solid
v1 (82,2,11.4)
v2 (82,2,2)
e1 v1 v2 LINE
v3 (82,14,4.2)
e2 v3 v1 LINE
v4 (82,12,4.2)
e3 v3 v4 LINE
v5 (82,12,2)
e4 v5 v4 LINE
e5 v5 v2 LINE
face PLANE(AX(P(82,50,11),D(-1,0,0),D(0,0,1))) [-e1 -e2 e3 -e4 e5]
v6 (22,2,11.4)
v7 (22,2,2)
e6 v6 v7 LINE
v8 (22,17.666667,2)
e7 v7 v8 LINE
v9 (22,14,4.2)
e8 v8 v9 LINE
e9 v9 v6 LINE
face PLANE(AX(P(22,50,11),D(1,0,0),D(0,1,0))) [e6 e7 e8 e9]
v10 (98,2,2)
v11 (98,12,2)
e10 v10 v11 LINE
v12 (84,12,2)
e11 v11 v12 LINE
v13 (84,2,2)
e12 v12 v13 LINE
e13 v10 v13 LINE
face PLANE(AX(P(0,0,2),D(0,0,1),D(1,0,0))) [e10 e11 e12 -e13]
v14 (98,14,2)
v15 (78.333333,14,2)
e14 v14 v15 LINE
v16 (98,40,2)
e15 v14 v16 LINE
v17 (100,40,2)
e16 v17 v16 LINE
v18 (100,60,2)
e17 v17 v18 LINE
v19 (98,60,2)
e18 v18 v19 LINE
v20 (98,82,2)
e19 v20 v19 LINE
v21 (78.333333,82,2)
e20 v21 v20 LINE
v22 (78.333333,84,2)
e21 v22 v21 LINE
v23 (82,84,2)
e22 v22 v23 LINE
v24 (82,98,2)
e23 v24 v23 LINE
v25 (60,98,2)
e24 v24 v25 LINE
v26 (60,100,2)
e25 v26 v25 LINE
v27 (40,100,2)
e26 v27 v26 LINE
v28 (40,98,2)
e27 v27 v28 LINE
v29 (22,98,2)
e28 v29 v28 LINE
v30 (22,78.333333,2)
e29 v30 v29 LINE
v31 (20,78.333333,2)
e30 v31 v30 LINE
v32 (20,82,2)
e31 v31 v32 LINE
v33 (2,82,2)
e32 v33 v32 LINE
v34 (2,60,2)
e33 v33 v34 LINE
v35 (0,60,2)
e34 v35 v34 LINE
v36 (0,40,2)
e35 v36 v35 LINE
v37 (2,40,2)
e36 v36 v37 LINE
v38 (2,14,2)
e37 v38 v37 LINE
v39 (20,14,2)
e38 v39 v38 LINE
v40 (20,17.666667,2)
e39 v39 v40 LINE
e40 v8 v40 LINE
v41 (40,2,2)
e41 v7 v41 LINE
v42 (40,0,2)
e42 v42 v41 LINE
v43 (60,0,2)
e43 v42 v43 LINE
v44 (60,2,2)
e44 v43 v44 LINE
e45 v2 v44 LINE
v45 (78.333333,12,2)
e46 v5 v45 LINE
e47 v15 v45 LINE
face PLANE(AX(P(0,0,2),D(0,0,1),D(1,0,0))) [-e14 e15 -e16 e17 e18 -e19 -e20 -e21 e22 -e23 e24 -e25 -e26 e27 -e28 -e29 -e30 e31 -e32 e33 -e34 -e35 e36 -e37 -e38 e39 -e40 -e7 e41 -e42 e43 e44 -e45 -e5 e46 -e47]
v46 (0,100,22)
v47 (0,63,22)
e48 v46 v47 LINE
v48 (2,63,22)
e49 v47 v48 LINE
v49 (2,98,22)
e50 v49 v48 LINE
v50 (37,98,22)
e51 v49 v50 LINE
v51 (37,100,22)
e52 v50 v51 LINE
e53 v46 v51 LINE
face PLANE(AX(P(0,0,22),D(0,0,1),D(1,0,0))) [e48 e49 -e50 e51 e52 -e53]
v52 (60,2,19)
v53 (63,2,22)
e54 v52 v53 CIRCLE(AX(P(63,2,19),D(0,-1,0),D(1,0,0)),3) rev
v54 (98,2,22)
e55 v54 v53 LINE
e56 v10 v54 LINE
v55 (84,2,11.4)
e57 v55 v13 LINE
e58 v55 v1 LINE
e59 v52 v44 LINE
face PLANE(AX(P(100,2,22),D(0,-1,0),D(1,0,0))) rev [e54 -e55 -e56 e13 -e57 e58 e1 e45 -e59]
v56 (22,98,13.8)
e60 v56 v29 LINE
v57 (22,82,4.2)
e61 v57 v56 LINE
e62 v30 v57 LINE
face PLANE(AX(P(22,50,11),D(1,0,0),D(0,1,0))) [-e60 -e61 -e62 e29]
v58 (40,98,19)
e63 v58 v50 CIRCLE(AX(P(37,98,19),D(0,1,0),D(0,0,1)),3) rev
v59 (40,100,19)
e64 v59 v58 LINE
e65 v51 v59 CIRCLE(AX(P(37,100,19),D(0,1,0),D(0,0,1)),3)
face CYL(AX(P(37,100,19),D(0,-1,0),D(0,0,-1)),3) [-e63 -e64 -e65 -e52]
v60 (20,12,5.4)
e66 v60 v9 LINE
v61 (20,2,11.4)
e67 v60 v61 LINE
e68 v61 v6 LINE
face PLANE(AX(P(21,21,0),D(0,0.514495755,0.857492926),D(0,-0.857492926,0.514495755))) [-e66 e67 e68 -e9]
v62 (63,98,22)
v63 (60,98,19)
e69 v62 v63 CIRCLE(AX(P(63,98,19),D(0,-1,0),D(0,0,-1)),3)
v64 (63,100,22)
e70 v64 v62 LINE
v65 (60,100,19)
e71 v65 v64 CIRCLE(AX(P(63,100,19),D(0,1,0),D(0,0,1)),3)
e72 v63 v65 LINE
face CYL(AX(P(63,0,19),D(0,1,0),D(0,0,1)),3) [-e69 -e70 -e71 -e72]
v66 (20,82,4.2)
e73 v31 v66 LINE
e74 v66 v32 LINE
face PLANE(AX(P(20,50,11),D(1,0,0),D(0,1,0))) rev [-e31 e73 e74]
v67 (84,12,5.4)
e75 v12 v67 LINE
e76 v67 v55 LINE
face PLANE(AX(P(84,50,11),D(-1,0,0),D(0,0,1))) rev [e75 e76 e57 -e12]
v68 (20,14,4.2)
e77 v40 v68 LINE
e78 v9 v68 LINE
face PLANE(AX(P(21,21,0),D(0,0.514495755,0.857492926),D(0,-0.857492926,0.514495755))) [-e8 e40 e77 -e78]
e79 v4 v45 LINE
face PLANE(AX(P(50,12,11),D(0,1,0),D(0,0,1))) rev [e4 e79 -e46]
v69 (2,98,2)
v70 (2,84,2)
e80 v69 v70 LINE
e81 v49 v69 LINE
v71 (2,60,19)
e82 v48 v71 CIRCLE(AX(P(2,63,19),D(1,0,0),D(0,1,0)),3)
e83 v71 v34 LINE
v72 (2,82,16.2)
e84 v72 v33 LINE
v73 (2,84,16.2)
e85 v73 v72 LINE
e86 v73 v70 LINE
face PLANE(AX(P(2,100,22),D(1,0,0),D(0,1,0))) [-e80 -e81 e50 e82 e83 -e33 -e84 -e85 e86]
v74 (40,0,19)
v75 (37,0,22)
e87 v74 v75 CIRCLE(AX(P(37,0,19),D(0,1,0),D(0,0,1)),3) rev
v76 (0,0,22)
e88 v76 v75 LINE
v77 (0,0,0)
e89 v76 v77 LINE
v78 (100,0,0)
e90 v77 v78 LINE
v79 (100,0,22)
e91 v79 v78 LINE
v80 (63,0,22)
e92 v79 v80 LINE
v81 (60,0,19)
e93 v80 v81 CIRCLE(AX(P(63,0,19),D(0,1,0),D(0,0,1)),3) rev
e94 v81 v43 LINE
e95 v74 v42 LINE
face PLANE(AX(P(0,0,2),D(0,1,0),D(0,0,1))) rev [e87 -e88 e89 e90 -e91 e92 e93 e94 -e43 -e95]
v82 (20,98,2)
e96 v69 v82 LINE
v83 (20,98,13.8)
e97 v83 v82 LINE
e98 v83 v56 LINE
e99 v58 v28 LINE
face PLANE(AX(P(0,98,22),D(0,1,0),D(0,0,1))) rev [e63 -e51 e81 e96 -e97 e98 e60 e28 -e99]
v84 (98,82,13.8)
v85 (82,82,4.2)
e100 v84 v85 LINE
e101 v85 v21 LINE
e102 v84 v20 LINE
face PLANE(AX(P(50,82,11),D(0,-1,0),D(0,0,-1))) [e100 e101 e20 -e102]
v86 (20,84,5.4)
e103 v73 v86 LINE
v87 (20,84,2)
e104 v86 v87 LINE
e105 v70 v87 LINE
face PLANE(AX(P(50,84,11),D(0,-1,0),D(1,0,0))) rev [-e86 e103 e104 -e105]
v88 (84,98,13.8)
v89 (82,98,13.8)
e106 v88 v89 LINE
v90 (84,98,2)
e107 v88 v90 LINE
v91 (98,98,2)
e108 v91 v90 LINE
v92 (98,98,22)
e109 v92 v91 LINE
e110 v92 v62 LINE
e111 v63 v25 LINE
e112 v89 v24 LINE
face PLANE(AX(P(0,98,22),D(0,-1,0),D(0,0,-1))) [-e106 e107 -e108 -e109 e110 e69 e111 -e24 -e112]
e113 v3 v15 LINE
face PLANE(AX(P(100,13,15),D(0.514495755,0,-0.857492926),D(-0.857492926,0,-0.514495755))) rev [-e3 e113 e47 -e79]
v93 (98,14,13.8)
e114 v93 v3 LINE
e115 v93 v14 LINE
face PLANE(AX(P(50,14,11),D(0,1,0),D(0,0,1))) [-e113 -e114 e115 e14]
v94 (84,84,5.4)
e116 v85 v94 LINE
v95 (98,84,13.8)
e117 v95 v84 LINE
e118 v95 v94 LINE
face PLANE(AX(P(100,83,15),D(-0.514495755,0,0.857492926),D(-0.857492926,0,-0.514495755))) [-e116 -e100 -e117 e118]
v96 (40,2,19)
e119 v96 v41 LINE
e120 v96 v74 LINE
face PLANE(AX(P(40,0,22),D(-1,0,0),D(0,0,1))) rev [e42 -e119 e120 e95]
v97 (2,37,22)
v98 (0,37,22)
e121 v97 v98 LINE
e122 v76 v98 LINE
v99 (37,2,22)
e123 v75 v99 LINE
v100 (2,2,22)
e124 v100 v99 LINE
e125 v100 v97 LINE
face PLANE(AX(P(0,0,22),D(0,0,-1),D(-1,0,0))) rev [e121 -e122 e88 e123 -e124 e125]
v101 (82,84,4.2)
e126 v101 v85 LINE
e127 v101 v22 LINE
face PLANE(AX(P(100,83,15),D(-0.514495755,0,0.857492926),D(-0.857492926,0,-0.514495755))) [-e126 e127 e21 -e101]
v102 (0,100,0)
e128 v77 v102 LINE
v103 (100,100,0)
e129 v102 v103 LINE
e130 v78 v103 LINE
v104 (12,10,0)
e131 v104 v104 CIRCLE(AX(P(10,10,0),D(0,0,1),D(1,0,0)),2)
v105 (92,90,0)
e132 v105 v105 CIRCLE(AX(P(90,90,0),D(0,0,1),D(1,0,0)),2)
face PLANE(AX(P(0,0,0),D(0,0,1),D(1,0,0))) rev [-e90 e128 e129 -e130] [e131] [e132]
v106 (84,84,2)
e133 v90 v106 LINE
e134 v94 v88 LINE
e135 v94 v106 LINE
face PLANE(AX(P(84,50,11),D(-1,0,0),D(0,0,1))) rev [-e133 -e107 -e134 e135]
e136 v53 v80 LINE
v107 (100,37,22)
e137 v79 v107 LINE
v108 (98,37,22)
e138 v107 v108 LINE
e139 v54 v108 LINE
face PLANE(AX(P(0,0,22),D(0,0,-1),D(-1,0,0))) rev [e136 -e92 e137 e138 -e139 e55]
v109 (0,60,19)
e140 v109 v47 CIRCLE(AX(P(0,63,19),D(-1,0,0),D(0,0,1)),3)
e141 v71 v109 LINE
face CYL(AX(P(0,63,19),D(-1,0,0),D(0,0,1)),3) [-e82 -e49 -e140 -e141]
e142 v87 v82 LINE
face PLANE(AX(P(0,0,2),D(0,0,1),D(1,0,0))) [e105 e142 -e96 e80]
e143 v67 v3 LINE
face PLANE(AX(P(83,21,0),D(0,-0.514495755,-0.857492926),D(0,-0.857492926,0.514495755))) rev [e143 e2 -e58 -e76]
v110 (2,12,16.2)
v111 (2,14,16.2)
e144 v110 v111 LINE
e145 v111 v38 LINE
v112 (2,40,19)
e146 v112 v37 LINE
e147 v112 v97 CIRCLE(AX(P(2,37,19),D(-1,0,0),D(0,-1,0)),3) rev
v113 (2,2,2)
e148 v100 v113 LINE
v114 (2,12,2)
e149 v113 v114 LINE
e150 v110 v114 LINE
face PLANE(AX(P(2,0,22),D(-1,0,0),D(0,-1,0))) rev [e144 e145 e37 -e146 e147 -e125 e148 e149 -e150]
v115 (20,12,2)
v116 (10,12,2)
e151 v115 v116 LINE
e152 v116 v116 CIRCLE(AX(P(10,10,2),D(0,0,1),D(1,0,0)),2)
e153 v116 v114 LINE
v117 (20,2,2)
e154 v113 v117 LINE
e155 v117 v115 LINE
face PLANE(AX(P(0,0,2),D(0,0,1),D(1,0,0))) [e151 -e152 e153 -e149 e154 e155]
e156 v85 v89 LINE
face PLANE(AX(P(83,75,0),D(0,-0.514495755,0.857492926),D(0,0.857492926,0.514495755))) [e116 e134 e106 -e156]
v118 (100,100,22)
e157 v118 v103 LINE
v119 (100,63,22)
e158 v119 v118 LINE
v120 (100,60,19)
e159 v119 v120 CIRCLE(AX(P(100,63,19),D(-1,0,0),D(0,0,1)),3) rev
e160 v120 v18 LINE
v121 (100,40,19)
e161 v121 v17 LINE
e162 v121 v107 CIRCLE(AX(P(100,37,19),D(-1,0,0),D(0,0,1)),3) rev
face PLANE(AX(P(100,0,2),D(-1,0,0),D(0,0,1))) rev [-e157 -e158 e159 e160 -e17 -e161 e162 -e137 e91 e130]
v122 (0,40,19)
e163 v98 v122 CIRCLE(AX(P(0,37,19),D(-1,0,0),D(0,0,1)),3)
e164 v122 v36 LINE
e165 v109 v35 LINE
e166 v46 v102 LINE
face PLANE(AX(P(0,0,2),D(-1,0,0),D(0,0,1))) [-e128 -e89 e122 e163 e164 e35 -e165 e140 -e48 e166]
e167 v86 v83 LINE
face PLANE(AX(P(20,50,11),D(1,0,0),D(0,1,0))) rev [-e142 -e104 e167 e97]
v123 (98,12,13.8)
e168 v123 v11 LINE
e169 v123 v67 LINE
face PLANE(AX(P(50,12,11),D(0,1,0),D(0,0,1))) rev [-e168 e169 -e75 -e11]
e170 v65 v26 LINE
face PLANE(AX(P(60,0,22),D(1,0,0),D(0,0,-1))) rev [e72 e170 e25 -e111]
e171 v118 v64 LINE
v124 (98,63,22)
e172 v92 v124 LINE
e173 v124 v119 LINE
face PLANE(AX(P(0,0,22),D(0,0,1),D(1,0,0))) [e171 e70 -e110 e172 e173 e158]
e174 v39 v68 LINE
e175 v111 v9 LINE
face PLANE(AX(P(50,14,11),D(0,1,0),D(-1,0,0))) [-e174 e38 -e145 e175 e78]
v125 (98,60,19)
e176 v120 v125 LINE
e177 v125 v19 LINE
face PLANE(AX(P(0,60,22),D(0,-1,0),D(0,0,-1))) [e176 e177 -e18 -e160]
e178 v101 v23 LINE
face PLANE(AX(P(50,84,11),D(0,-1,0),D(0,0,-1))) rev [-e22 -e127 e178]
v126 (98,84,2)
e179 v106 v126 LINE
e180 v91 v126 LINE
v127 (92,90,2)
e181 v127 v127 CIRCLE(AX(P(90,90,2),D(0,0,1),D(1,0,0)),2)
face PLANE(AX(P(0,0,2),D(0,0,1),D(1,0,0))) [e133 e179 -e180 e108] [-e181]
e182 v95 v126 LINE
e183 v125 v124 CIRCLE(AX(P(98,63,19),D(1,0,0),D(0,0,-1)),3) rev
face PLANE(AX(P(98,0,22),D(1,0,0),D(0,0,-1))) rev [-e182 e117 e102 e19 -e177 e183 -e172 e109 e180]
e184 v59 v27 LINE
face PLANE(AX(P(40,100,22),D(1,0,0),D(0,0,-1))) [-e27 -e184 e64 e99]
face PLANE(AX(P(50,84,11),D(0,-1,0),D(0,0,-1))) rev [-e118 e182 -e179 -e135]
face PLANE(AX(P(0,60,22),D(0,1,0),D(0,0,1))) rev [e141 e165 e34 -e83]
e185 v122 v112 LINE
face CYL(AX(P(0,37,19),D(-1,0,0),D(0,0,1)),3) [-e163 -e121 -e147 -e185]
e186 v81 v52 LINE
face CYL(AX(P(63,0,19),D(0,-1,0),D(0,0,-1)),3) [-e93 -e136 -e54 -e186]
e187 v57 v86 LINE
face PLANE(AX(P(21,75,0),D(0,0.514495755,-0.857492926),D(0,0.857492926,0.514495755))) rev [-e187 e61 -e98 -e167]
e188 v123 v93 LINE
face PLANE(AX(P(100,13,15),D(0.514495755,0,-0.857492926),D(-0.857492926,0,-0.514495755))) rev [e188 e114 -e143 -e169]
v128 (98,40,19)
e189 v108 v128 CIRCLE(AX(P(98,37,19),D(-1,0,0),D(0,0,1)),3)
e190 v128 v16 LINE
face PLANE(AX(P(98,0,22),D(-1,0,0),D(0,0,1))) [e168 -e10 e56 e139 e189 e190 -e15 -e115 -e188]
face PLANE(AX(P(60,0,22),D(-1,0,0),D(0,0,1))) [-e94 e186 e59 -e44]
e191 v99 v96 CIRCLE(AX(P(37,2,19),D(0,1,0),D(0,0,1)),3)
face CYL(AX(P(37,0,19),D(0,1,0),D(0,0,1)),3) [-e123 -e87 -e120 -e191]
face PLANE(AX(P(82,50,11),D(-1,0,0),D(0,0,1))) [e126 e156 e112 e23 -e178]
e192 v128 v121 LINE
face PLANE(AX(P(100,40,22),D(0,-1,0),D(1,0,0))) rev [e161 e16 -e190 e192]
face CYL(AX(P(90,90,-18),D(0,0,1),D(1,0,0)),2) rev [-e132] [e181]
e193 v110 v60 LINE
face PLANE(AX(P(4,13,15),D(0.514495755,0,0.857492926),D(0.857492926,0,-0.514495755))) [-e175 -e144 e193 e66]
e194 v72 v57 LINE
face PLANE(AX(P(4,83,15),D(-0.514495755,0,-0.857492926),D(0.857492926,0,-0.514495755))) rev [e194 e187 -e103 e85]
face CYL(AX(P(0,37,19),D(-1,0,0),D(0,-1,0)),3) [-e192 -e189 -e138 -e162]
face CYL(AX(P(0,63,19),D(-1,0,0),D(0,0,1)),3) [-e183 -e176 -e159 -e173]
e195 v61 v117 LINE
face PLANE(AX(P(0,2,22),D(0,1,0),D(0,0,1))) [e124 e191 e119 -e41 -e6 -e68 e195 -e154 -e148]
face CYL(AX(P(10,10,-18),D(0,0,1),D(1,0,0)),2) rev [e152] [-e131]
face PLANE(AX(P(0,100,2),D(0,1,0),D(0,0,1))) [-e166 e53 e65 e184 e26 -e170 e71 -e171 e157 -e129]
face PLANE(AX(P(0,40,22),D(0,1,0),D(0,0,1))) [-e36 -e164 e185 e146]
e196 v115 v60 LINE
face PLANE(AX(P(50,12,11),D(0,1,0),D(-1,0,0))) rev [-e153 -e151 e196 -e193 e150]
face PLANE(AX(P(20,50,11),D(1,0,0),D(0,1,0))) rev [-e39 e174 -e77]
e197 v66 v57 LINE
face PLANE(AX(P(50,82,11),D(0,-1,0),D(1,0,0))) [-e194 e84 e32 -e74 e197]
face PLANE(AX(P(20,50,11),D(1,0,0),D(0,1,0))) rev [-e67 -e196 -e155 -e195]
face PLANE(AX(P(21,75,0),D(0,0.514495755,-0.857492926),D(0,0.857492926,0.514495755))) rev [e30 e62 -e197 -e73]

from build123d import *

# Parameters (mm, degrees)
SKETCH_1_W          = 100
SKETCH_1_H          = 100
EXTRUDE_1_DEPTH     = 2
SKETCH_2_W          = 2
SKETCH_2_H          = 2
SKETCH_2_W_2        = 38
SKETCH_2_H_2        = 38
EXTRUDE_2_DEPTH     = 20
SKETCH_3_W          = 38
SKETCH_3_H          = 2
SKETCH_3_W_2        = 2
SKETCH_3_H_2        = 38
SKETCH_3_H_3        = 40
SKETCH_3_W_3        = 40
EXTRUDE_3_DEPTH     = 20
RIB_2_REACH         = 133.807
SKETCH_7_WALL_W     = 294.768112702
SKETCH_7_WALL_H     = 2
FILLET_1_R          = 3
RIB_3_REACH         = 133.807
SKETCH_8_WALL_W     = 294.768112702
SKETCH_8_WALL_H     = 2
MIRROR_START        = 20
MIRROR_3_DEPTH      = 2
MIRROR_START_2      = 82
MIRROR_3_2_DEPTH    = 2
MIRROR_START_3      = 2
MIRROR_3_3_DEPTH    = 18
MIRROR_START_4      = 84
MIRROR_3_4_DEPTH    = 14
MIRROR_START_5      = 12
MIRROR_3_5_DEPTH    = 2
SKETCH_10_R         = 2
CUT_EXTRUDE_1_DEPTH = 20
SKETCH_11_R         = 2
CUT_EXTRUDE_2_DEPTH = 20


with BuildPart() as part:
    # 草图1 → 凸台-拉伸1 (new body)
    with BuildSketch(Plane.XY):
        with Locations((50, 50)):
            Rectangle(SKETCH_1_W, SKETCH_1_H)
    extrude(amount=EXTRUDE_1_DEPTH)

    # 草图2 → 凸台-拉伸2 (add)
    with BuildSketch(Plane.XY.offset(2)):
        with Locations((1, 99)):
            Rectangle(SKETCH_2_W, SKETCH_2_H)
        with Locations((21, 99)):
            Rectangle(SKETCH_2_W_2, SKETCH_2_H)
        with Locations((1, 79)):
            Rectangle(SKETCH_2_W, SKETCH_2_H_2)
        with Locations((1, 21)):
            Rectangle(SKETCH_2_W, SKETCH_2_H_2)
        with Locations((1, 1)):
            Rectangle(SKETCH_2_W, SKETCH_2_H)
        with Locations((21, 1)):
            Rectangle(SKETCH_2_W_2, SKETCH_2_H)
    extrude(amount=EXTRUDE_2_DEPTH)

    # 草图3 → 凸台-拉伸3 (add)
    with BuildSketch(Plane.XY.offset(2)):
        with Locations((79, 99)):
            Rectangle(SKETCH_3_W, SKETCH_3_H)
        with Locations((99, 99)):
            Rectangle(SKETCH_3_W_2, SKETCH_3_H)
        with Locations((99, 79)):
            Rectangle(SKETCH_3_W_2, SKETCH_3_H_2)
        with Locations((99, 20)):
            Rectangle(SKETCH_3_W_2, SKETCH_3_H_3)
        with Locations((80, 1)):
            Rectangle(SKETCH_3_W_3, SKETCH_3_H)
    extrude(amount=EXTRUDE_3_DEPTH)

    # 草图7 wall → 筋2 (add, up to next)
    with BuildSketch(Plane(origin=(87.5, 83, 7.5), x_dir=(-0.857492925713, 0, -0.514495755428), z_dir=(0.514495755428, 0, -0.857492925713)), mode=Mode.PRIVATE) as rib_2_sk1:
        Rectangle(SKETCH_7_WALL_W, SKETCH_7_WALL_H)
    rib_2_tool1 = extrude(rib_2_sk1.sketch, amount=RIB_2_REACH, mode=Mode.PRIVATE) - part.part
    rib_2 = rib_2_tool1.solids().sort_by_distance((87.5, 83, 7.5))[0]
    add(rib_2)

    # 圆角1
    fillet_1_edges = [part.edges().sort_by_distance(p)[0] for p in [
        (40, 1, 22),
        (1, 40, 22),
        (1, 60, 22),
        (40, 99, 22),
        (99, 60, 22),
        (60, 99, 22),
        (99, 40, 22),
        (60, 1, 22),
    ]]
    fillet(fillet_1_edges, radius=FILLET_1_R)

    # 草图8 wall → 筋3 (add, up to next)
    with BuildSketch(Plane(origin=(83, 87.5, 7.5), x_dir=(0, 0.857492925713, 0.514495755428), z_dir=(0, 0.514495755428, -0.857492925713)), mode=Mode.PRIVATE) as rib_3_sk1:
        Rectangle(SKETCH_8_WALL_W, SKETCH_8_WALL_H)
    rib_3_tool1 = extrude(rib_3_sk1.sketch, amount=RIB_3_REACH, mode=Mode.PRIVATE) - part.part
    rib_3 = rib_3_tool1.solids().sort_by_distance((83, 87.5, 7.5))[0]
    add(rib_3)

    # 镜向1: 筋3 mirrored; each copy of 筋3 runs up to whatever stops it at its own place
    mirror_1_before = part.part  # the part as the pattern finds it: every copy runs up to it
    mirror_1_rib_3_long = extrude(rib_3_sk1.sketch, amount=RIB_3_REACH, mode=Mode.PRIVATE)
    mirror_1_rib_3_tool1 = mirror_1_rib_3_long.mirror(Plane(origin=(52, 0, 0), x_dir=(0, 0, 1), z_dir=(1, 0, 0))) - mirror_1_before
    add(mirror_1_rib_3_tool1.solids().sort_by_distance((21, 87.5, 7.5))[0])

    # 镜向2: 筋2 mirrored; each copy of 筋2 runs up to whatever stops it at its own place
    mirror_2_before = part.part  # the part as the pattern finds it: every copy runs up to it
    mirror_2_rib_2_long = extrude(rib_2_sk1.sketch, amount=RIB_2_REACH, mode=Mode.PRIVATE)
    mirror_2_rib_2_tool1 = mirror_2_rib_2_long.mirror(Plane(origin=(52, 0, 0), x_dir=(0, 0, 1), z_dir=(1, 0, 0))) - mirror_2_before
    add(mirror_2_rib_2_tool1.solids().sort_by_distance((16.5, 83, 7.5))[0])

    # 镜向3: read off the stored shape, not the designer's step
    # 镜向3 outline → 镜向3 (add)
    with BuildSketch(Plane.YZ.offset(MIRROR_START)):
        Polygon((17.666666667, 2), (14, 4.2), (2, 11.4), (2, 2), align=None)
    extrude(amount=MIRROR_3_DEPTH)

    # Mirror 3 2 outline → Mirror 3 2 (add)
    with BuildSketch(Plane.YZ.offset(MIRROR_START_2)):
        Polygon((14, 2), (14, 4.2), (2, 11.4), (2, 2), align=None)
    extrude(amount=MIRROR_3_2_DEPTH)

    # Mirror 3 3 outline → Mirror 3 3 (add)
    with BuildSketch(Plane.YZ.offset(MIRROR_START_3)):
        Polygon((14, 2), (14, 4.2), (12, 5.4), (12, 2), align=None)
    extrude(amount=MIRROR_3_3_DEPTH)

    # Mirror 3 4 outline → Mirror 3 4 (add)
    with BuildSketch(Plane.YZ.offset(MIRROR_START_4)):
        Polygon((14, 2), (14, 4.2), (12, 5.4), (12, 2), align=None)
    extrude(amount=MIRROR_3_4_DEPTH)

    # Mirror 3 5 outline → Mirror 3 5 (add)
    with BuildSketch(Plane(origin=(0, 0, 0), x_dir=(1, 0, 0), z_dir=(0, 1, 0)).offset(MIRROR_START_5)):
        Polygon((98, -13.8), (98, -2), (78.333333333, -2), align=None)
        Polygon((2, -16.2), (22, -4.2), (20, -4.2), (20, -2), (2, -2), align=None)
    extrude(amount=MIRROR_3_5_DEPTH)

    # 草图10 → 切除-拉伸1 (cut)
    with BuildSketch(Plane.XY.offset(2)):
        with Locations((90, 90)):
            Circle(SKETCH_10_R)
    extrude(amount=-CUT_EXTRUDE_1_DEPTH, mode=Mode.SUBTRACT)

    # 草图11 → 切除-拉伸2 (cut)
    with BuildSketch(Plane.XY.offset(2)):
        with Locations((10, 10)):
            Circle(SKETCH_11_R)
    extrude(amount=-CUT_EXTRUDE_2_DEPTH, mode=Mode.SUBTRACT)


solid = part.part
